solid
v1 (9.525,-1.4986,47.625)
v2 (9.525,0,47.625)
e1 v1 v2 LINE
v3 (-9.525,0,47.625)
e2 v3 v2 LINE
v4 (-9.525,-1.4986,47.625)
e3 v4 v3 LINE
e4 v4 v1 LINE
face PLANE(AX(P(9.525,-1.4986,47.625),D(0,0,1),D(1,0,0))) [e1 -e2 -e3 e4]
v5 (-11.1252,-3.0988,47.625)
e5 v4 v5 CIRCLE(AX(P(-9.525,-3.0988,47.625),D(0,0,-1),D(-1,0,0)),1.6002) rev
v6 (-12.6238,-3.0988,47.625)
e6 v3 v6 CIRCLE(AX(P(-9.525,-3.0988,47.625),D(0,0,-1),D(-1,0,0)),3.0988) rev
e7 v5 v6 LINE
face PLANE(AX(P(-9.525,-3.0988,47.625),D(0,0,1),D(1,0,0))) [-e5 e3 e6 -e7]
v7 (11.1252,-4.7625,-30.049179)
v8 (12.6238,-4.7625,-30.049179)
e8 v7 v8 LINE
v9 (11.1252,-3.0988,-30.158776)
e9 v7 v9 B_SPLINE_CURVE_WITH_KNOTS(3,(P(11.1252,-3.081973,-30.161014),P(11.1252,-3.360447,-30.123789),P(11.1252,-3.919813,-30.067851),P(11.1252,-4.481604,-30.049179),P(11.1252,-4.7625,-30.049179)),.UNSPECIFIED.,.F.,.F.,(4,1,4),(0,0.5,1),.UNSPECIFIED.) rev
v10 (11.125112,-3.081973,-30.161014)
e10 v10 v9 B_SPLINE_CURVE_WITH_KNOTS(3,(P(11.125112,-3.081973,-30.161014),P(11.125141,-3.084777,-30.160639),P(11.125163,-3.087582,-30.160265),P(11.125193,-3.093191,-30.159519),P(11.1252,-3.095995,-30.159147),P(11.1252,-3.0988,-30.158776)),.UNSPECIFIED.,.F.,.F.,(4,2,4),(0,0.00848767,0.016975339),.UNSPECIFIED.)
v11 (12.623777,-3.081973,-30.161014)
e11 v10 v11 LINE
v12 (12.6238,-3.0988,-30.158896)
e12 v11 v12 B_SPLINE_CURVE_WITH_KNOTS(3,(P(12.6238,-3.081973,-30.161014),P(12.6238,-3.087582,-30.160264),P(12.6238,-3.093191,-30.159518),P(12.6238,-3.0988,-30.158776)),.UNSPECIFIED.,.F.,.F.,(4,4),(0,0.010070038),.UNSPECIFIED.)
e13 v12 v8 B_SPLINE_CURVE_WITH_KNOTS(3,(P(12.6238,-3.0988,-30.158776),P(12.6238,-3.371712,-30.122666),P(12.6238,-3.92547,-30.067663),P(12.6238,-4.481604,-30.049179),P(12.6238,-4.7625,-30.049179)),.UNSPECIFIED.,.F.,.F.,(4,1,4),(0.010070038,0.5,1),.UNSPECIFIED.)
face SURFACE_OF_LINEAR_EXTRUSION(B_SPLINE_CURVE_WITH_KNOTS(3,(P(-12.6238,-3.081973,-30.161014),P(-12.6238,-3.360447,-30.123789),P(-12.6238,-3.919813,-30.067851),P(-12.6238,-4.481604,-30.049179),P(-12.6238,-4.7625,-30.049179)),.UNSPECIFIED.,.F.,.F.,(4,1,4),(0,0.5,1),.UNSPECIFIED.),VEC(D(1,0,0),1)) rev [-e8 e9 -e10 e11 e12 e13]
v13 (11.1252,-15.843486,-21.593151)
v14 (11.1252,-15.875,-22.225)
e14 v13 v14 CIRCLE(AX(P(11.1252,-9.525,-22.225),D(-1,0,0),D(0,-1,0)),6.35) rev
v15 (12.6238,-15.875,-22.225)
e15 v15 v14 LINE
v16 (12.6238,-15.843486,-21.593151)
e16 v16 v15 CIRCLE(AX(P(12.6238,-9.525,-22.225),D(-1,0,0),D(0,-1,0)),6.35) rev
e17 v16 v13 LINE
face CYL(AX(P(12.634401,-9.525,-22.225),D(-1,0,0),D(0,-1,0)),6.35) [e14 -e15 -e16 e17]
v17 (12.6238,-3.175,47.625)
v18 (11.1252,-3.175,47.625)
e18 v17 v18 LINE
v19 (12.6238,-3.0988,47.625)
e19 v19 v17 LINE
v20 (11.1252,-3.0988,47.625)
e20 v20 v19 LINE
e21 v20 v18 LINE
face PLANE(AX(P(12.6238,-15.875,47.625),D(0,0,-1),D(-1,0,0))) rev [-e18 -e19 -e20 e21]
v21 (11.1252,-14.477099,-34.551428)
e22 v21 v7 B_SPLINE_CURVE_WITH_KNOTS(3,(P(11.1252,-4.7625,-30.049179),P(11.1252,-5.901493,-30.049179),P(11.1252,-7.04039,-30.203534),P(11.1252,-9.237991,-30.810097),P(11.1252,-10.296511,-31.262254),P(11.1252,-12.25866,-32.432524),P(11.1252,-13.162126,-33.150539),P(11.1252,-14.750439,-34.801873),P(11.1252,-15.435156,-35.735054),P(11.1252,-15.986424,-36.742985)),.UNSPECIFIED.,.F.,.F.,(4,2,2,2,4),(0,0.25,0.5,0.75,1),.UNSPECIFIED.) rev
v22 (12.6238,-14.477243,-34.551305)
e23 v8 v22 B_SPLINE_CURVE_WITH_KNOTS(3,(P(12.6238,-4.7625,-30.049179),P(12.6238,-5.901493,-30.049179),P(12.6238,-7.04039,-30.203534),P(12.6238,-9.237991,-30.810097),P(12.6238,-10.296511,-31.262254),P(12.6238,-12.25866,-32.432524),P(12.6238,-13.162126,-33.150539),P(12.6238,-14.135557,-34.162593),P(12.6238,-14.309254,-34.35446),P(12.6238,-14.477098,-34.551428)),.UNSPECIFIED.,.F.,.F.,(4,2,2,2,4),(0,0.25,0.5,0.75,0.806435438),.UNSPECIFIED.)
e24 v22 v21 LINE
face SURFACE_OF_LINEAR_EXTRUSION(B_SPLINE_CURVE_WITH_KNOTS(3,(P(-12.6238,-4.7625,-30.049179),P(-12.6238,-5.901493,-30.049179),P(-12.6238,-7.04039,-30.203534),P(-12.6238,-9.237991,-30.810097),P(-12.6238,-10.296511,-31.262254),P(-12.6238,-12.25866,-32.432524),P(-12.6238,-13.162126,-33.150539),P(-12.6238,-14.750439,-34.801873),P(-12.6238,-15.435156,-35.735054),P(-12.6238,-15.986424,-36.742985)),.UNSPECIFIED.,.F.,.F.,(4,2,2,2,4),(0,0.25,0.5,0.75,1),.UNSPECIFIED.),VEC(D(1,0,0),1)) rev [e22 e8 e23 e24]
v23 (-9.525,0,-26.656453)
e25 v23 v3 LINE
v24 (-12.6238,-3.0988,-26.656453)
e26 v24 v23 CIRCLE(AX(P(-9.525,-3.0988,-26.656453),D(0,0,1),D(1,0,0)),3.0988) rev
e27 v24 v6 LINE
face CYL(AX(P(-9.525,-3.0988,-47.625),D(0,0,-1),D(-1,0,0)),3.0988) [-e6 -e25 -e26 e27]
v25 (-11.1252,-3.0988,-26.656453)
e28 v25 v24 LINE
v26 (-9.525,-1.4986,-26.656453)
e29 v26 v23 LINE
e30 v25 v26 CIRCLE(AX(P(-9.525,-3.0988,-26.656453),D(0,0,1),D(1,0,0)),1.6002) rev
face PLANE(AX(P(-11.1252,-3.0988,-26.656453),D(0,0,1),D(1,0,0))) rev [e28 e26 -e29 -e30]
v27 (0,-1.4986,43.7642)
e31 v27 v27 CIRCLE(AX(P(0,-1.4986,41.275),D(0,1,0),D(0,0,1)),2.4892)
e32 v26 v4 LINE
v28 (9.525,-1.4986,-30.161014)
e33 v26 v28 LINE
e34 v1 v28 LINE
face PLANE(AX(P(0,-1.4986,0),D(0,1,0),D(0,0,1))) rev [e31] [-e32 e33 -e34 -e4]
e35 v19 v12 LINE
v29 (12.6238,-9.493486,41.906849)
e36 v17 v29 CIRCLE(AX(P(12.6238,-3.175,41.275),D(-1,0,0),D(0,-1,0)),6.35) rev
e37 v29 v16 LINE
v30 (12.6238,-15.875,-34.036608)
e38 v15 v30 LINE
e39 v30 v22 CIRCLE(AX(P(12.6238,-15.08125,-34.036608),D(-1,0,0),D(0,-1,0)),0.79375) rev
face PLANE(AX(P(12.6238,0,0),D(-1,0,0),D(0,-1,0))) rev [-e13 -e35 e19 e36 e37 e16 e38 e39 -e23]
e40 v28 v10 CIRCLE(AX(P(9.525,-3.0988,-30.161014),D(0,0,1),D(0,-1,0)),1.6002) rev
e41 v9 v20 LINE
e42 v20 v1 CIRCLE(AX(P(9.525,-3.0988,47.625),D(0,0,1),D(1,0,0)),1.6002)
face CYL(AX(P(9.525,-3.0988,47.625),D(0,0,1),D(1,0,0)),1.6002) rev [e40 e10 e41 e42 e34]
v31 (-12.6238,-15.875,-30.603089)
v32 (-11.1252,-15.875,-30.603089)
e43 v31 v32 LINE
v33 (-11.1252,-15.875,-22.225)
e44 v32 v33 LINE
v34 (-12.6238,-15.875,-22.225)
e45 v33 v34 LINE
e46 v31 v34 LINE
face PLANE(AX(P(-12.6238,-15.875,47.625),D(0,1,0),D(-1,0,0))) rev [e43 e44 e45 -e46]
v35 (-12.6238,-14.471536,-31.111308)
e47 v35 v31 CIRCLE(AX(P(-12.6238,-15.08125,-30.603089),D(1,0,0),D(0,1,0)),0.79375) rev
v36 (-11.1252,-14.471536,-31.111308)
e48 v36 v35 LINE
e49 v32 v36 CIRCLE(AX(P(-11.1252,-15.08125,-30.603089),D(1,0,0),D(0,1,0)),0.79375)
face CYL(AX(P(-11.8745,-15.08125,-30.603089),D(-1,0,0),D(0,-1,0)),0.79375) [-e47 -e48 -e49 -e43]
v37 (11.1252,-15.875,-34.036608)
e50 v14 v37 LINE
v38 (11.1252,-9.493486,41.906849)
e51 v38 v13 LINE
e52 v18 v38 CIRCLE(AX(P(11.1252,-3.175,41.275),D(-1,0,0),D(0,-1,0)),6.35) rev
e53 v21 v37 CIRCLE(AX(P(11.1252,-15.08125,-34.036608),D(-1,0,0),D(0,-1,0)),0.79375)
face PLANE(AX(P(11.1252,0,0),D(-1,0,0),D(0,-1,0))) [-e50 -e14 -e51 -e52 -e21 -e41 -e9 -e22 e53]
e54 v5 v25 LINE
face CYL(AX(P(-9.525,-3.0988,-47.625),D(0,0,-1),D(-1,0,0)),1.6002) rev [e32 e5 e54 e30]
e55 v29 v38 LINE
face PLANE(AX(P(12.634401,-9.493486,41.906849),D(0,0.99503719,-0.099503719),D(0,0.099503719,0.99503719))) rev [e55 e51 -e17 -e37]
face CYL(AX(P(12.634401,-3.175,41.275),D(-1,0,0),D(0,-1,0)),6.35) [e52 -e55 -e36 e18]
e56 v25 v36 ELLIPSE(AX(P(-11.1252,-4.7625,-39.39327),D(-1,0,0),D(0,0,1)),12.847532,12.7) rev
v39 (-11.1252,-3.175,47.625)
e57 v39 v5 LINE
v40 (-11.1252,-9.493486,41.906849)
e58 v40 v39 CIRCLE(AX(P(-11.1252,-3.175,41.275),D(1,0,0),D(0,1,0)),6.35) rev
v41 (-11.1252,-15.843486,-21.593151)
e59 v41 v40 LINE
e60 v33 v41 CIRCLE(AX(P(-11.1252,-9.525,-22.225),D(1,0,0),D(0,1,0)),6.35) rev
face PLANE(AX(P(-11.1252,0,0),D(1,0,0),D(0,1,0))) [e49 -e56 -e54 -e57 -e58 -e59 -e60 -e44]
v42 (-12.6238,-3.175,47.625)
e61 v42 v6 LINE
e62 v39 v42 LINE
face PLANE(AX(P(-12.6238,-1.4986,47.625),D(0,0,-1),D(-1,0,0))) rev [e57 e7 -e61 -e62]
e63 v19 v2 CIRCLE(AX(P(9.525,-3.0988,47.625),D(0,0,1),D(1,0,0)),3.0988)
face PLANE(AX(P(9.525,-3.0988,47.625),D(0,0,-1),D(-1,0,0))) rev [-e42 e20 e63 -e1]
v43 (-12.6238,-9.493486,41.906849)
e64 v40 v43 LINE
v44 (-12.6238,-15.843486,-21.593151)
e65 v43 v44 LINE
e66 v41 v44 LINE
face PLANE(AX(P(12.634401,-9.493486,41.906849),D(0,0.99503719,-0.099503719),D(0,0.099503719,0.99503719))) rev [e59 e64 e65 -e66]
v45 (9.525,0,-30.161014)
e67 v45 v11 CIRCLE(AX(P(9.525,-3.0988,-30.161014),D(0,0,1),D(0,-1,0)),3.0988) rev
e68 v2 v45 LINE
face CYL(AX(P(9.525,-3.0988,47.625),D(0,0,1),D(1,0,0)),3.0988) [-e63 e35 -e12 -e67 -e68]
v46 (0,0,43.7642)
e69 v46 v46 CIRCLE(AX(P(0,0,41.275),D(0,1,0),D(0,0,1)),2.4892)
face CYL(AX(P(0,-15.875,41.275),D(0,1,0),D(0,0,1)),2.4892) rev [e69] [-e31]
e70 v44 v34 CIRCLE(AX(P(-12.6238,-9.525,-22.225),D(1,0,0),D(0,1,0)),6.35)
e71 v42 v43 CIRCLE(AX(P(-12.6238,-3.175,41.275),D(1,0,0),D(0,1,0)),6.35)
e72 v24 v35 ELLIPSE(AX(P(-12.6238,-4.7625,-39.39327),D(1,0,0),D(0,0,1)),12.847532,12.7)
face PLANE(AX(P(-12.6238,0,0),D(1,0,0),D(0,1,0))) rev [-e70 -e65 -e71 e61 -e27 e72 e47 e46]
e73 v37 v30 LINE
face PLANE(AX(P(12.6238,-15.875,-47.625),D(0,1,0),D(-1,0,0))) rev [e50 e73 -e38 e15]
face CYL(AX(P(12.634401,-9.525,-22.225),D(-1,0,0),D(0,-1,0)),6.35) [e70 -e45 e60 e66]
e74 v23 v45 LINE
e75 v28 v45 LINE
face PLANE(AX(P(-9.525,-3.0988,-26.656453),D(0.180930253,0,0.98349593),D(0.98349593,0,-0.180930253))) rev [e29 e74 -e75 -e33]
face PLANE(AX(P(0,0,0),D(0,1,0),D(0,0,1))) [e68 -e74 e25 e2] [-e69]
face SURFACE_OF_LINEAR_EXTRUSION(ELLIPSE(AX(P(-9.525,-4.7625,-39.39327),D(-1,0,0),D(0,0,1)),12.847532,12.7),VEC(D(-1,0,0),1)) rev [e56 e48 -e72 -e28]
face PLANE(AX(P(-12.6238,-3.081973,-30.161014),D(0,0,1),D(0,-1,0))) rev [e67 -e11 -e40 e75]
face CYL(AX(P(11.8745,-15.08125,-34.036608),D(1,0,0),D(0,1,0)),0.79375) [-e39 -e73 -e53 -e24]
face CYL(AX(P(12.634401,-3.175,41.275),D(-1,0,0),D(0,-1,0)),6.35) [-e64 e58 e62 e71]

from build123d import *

# Parameters (mm, degrees)
BASE_FLANGE1_START      = -1.4986
BASE_FLANGE1_OUTLINE_W  = 19.05
BASE_FLANGE1_OUTLINE_H  = 95.25
BASE_FLANGE1_DEPTH      = 1.4986
EDGE_FLANGE2_DEPTH      = 95.25
EDGE_FLANGE2_BEND_DEPTH = 95.25
CUT_EXTRUDE2_DEPTH      = 52.76404714123502
CUT_EXTRUDE2_DEPTH_BACK = 52.76404714123502
SKETCH22_R              = 2.4892000000000007
SURFACECUT1_START       = -8.467465696
SURFACECUT1_DEPTH       = 28.142997323
CUT_EXTRUDE5_START      = -7.730915537
CUT_EXTRUDE5_DEPTH      = 7.730915537
CUT_EXTRUDE6_DEPTH      = 3.0988
CUT_EXTRUDE7_DEPTH      = 3.0988
CUT_EXTRUDE3_DEPTH      = 57.19250460256741
FILLET1_R               = 0.79375


# Read off the part's stored shape, not the designer's step: Base-Flange1, SurfaceCut1, Cut-Extrude5
# Sheet-metal steps are written as plain solids
with BuildPart() as part:
    # Base-Flange1 outline → Base-Flange1 (new body)
    with BuildSketch(Plane(origin=(0, 0, 0), x_dir=(1, 0, 0), z_dir=(0, 1, 0)).offset(BASE_FLANGE1_START)):
        Rectangle(BASE_FLANGE1_OUTLINE_W, BASE_FLANGE1_OUTLINE_H)
    extrude(amount=BASE_FLANGE1_DEPTH)

    # Edge-Flange2 section (across the edge) → Edge-Flange2 (add)
    with BuildSketch(Plane(origin=(11.125200000000007, -1.4985999999999888, -47.625), x_dir=(-1, -3.49e-15, 0), z_dir=(0, 0, 1))):
        with BuildLine():
            Line((-1.4985999999999997, 1.6002000000000056), (-1.4985999999999997, 14.3764))
            Line((-1.4985999999999997, 14.3764), (0, 14.3764))
            Line((0, 14.3764), (0, 1.6002000000000056))
            ThreePointArc((0, 1.6002000000000056), (0.46868772874528863, 0.4686877287452902), (1.6002000000000056, 5.55e-15))
            Line((1.6002000000000056, 5.55e-15), (1.600200000000011, -1.4985999999999942))
            ThreePointArc((1.600200000000011, -1.4985999999999942), (-0.5909824935408694, -0.5909824935408718), (-1.4985999999999997, 1.6002000000000056))
        make_face()
    extrude(amount=EDGE_FLANGE2_DEPTH)

    # Edge-Flange2 section 2 (across the edge) → Edge-Flange2 bend (add)
    with BuildSketch(Plane(origin=(-11.125200000000007, -1.4985999999999888, 47.625), x_dir=(1, -3.49e-15, 0), z_dir=(0, 0, -1))):
        with BuildLine():
            Line((-1.4985999999999997, 1.6002000000000056), (-1.4985999999999997, 14.3764))
            Line((-1.4985999999999997, 14.3764), (0, 14.3764))
            Line((0, 14.3764), (0, 1.6002000000000056))
            ThreePointArc((0, 1.6002000000000056), (0.46868772874528863, 0.4686877287452902), (1.6002000000000056, 5.55e-15))
            Line((1.6002000000000056, 5.55e-15), (1.600200000000011, -1.4985999999999942))
            ThreePointArc((1.600200000000011, -1.4985999999999942), (-0.5909824935408694, -0.5909824935408718), (-1.4985999999999997, 1.6002000000000056))
        make_face()
    extrude(amount=EDGE_FLANGE2_BEND_DEPTH)

    # Sketch22 → Cut-Extrude2 (cut, two sides: drawn at the far end of the back side and taken through both)
    with BuildSketch(Plane(origin=(0, 0, 0), x_dir=(1, 0, 0), z_dir=(0, 1, 0)).offset(-CUT_EXTRUDE2_DEPTH_BACK)):
        with Locations(Location((0, -41.275, 0), (0, 0, 270))):
            Circle(SKETCH22_R)
    extrude(amount=CUT_EXTRUDE2_DEPTH + CUT_EXTRUDE2_DEPTH_BACK, mode=Mode.SUBTRACT)

    # SurfaceCut1 outline → SurfaceCut1 (cut)
    with BuildSketch(Plane(origin=(0, 0, 0), x_dir=(0, 1, 0), z_dir=(0.9885166943248128, 0, -0.15111169723467696)).offset(SURFACECUT1_START)):
        with BuildLine():
            ThreePointArc((-4.7625, -28.14850854), (-11.21253157, -29.908348909), (-15.875, -34.700147478))
            Line((-15.875, -34.700147478), (-15.875, -45.396959713))
            Line((-15.875, -45.396959713), (-15.875, -48.985711411))
            Line((-15.875, -48.985711411), (-15.875, -50))
            Line((-15.875, -50), (-1.4986, -50))
            Line((-1.4986, -50), (-1.4986, -48.517446483))
            Line((-1.4986, -48.517446483), (-1.4986, -28.575083721))
            ThreePointArc((-1.4986, -28.575083721), (-3.116671212, -28.255603887), (-4.7625, -28.14850854))
        make_face()
        with BuildLine():
            ThreePointArc((4.904e-06, -29.075295425), (-0.741511706, -28.801863648), (-1.4986, -28.575083721))
            Line((-1.4986, -28.575083721), (-1.4986, -48.517446483))
            Line((-1.4986, -48.517446483), (-1.4986, -50))
            Line((-1.4986, -50), (0, -50))
            Line((0, -50), (0, -48.517446483))
            Line((0, -48.517446483), (4.904e-06, -29.075295425))
        make_face()
    extrude(amount=SURFACECUT1_DEPTH, mode=Mode.SUBTRACT)

    # Cut-Extrude5 outline → Cut-Extrude5 (cut)
    with BuildSketch(Plane(origin=(12.623799999999989, 4.417e-14, 0), x_dir=(0, 0, -1), z_dir=(1, 3.5e-15, 0)).offset(CUT_EXTRUDE5_START)):
        with BuildLine():
            Line((30.161013656, 0), (30.161013656, -3.081973107))
            add(Edge.make_bspline(
                [(30.161013656, -3.081973107), (30.123789076338376, -3.3604465015117064), (30.06785145291286, -3.91981299251284), (30.04917867771754, -4.481604272315385), (30.049178677717507, -5.901493089885278), (30.203533924549607, -7.040390278974325), (30.810097482517182, -9.23799149755241), (31.262254102606217, -10.296510885520753), (32.43252435045563, -12.258659918928036), (33.15053883450323, -13.162125608464567), (34.747119867091556, -14.697775892591103), (35.61176103928939, -15.343862250932757), (36.543461511, -15.875)],
                knots=[7.01e-15, 7.01e-15, 7.01e-15, 7.01e-15, 0.49999999999999956, 1.0000000000000067, 1.0000000000000067, 3.0274304263670744, 3.0274304263670744, 5.054860852734149, 5.054860852734149, 7.082291279101224, 7.082291279101224, 8.9752750105383, 8.9752750105383, 8.9752750105383, 8.9752750105383], degree=3))
            Line((36.543461511, -15.875), (37.033012726, -15.875))
            Line((37.033012726, -15.875), (37.033012726, 0))
            Line((37.033012726, 0), (30.161013656, 0))
        make_face()
    extrude(amount=CUT_EXTRUDE5_DEPTH, mode=Mode.SUBTRACT)

    # Sketch45 → Cut-Extrude6 (cut)
    with BuildSketch(Plane.ZY.offset(12.623799999999989)):
        with BuildLine():
            Line((-27.956993224305993, -3.333e-14), (-30.16101365632842, 9.1e-16))
            Line((-30.16101365632842, 9.1e-16), (-36.543461511337, -8e-16))
            Line((-36.543461511337, -8e-16), (-36.543461511337, -15.874999999986066))
            Line((-36.543461511337, -15.874999999986066), (-33.17348490156023, -15.875000000001156))
            add(Edge.make_bspline(
                [(-33.17348490156023, -15.875000000001156), (-26.545737514477914, -12.250087357596882), (-26.545737514477917, -4.762499999999605)],
                knots=[5.217749490668621, 5.217749490668621, 5.217749490668621, 6.283185307179613, 6.283185307179613, 6.283185307179613], degree=2, weights=[1, 0.8614298921780303, 1]))
            add(Edge.make_bspline(
                [(-26.545737514477917, -4.762499999999605), (-26.54573751447792, -3.9270502006252928), (-26.65645281584444, -3.098800000000031)],
                knots=[2.713e-14, 2.713e-14, 2.713e-14, 0.13137760520102773, 0.13137760520102773, 0.13137760520102773], degree=2, weights=[1, 0.9978432663026745, 1]))
            add(Edge.make_bspline(
                [(-26.65645281584444, -3.098800000000031), (-26.684580856749765, -2.888376912716788), (-26.720679971169147, -2.6830962290480005), (-26.807185378421263, -2.2819272788971268), (-26.85827209747719, -2.08400579105707), (-26.969891004260706, -1.7101957732584916), (-27.030292368751276, -1.5339055104769577), (-27.157879164314696, -1.2013029710556327), (-27.22503599588623, -1.045497343577505), (-27.358398930056477, -0.7651263937563396), (-27.425255566221505, -0.6388233840907098), (-27.556567938722992, -0.41451622077370254), (-27.61948989121088, -0.31919542751514146), (-27.793980163734616, -0.08637757170014503), (-27.892843777023433, -3.459e-14), (-27.956993224305993, -3.333e-14)],
                knots=[0, 0, 0, 0, 0.1249999999999998, 0.1249999999999998, 0.2499999999999996, 0.2499999999999996, 0.37499999999999944, 0.37499999999999944, 0.4999999999999992, 0.4999999999999992, 0.624999999999999, 0.624999999999999, 0.7499999999999989, 0.7499999999999989, 1, 1, 1, 1], degree=3))
        make_face()
    extrude(amount=-CUT_EXTRUDE6_DEPTH, mode=Mode.SUBTRACT)

    # Sketch46 → Cut-Extrude7 (cut)
    with BuildSketch(Plane(origin=(0, 0, 0), x_dir=(1, 0, 0), z_dir=(0, 1, 0))):
        Polygon((-11.125200000000001, 26.65645281584444), (-12.623800000000001, 26.65645281584444), (-12.623800000000044, 30.161013656328407), (9.52499999999999, 30.16101365632841), (-9.525, 26.65645281584444), align=None)
    extrude(amount=-CUT_EXTRUDE7_DEPTH, mode=Mode.SUBTRACT)

    # Sketch36 → Cut-Extrude3 (cut, through all)
    with BuildSketch(Plane.ZY.offset(12.623799999999989)):
        with BuildLine():
            Line((41.90684861578345, -9.493486157833454), (-21.593151384216544, -15.84348615783458))
            ThreePointArc((-21.593151384216544, -15.84348615783458), (-21.908682993060925, -15.867116645973631), (-22.224999999999994, -15.875000000001158))
            Line((-22.224999999999994, -15.875000000001158), (47.625, -15.875000000000039))
            Line((47.625, -15.875000000000039), (47.62499999999999, -3.1750000000000345))
            ThreePointArc((47.62499999999999, -3.1750000000000345), (45.98322358805446, -7.435883786831999), (41.90684861578345, -9.493486157833454))
        make_face()
    extrude(amount=-CUT_EXTRUDE3_DEPTH, mode=Mode.SUBTRACT)

    # Fillet1
    fillet1_edges = [part.edges().sort_by_distance(p)[0] for p in [
        (11.874500000000051, -15.874999999999957, -36.543461511),
        (-11.874500000000051, -15.875000000001114, -33.17348490156023),
    ]]
    fillet(fillet1_edges, radius=FILLET1_R)


solid = part.part
